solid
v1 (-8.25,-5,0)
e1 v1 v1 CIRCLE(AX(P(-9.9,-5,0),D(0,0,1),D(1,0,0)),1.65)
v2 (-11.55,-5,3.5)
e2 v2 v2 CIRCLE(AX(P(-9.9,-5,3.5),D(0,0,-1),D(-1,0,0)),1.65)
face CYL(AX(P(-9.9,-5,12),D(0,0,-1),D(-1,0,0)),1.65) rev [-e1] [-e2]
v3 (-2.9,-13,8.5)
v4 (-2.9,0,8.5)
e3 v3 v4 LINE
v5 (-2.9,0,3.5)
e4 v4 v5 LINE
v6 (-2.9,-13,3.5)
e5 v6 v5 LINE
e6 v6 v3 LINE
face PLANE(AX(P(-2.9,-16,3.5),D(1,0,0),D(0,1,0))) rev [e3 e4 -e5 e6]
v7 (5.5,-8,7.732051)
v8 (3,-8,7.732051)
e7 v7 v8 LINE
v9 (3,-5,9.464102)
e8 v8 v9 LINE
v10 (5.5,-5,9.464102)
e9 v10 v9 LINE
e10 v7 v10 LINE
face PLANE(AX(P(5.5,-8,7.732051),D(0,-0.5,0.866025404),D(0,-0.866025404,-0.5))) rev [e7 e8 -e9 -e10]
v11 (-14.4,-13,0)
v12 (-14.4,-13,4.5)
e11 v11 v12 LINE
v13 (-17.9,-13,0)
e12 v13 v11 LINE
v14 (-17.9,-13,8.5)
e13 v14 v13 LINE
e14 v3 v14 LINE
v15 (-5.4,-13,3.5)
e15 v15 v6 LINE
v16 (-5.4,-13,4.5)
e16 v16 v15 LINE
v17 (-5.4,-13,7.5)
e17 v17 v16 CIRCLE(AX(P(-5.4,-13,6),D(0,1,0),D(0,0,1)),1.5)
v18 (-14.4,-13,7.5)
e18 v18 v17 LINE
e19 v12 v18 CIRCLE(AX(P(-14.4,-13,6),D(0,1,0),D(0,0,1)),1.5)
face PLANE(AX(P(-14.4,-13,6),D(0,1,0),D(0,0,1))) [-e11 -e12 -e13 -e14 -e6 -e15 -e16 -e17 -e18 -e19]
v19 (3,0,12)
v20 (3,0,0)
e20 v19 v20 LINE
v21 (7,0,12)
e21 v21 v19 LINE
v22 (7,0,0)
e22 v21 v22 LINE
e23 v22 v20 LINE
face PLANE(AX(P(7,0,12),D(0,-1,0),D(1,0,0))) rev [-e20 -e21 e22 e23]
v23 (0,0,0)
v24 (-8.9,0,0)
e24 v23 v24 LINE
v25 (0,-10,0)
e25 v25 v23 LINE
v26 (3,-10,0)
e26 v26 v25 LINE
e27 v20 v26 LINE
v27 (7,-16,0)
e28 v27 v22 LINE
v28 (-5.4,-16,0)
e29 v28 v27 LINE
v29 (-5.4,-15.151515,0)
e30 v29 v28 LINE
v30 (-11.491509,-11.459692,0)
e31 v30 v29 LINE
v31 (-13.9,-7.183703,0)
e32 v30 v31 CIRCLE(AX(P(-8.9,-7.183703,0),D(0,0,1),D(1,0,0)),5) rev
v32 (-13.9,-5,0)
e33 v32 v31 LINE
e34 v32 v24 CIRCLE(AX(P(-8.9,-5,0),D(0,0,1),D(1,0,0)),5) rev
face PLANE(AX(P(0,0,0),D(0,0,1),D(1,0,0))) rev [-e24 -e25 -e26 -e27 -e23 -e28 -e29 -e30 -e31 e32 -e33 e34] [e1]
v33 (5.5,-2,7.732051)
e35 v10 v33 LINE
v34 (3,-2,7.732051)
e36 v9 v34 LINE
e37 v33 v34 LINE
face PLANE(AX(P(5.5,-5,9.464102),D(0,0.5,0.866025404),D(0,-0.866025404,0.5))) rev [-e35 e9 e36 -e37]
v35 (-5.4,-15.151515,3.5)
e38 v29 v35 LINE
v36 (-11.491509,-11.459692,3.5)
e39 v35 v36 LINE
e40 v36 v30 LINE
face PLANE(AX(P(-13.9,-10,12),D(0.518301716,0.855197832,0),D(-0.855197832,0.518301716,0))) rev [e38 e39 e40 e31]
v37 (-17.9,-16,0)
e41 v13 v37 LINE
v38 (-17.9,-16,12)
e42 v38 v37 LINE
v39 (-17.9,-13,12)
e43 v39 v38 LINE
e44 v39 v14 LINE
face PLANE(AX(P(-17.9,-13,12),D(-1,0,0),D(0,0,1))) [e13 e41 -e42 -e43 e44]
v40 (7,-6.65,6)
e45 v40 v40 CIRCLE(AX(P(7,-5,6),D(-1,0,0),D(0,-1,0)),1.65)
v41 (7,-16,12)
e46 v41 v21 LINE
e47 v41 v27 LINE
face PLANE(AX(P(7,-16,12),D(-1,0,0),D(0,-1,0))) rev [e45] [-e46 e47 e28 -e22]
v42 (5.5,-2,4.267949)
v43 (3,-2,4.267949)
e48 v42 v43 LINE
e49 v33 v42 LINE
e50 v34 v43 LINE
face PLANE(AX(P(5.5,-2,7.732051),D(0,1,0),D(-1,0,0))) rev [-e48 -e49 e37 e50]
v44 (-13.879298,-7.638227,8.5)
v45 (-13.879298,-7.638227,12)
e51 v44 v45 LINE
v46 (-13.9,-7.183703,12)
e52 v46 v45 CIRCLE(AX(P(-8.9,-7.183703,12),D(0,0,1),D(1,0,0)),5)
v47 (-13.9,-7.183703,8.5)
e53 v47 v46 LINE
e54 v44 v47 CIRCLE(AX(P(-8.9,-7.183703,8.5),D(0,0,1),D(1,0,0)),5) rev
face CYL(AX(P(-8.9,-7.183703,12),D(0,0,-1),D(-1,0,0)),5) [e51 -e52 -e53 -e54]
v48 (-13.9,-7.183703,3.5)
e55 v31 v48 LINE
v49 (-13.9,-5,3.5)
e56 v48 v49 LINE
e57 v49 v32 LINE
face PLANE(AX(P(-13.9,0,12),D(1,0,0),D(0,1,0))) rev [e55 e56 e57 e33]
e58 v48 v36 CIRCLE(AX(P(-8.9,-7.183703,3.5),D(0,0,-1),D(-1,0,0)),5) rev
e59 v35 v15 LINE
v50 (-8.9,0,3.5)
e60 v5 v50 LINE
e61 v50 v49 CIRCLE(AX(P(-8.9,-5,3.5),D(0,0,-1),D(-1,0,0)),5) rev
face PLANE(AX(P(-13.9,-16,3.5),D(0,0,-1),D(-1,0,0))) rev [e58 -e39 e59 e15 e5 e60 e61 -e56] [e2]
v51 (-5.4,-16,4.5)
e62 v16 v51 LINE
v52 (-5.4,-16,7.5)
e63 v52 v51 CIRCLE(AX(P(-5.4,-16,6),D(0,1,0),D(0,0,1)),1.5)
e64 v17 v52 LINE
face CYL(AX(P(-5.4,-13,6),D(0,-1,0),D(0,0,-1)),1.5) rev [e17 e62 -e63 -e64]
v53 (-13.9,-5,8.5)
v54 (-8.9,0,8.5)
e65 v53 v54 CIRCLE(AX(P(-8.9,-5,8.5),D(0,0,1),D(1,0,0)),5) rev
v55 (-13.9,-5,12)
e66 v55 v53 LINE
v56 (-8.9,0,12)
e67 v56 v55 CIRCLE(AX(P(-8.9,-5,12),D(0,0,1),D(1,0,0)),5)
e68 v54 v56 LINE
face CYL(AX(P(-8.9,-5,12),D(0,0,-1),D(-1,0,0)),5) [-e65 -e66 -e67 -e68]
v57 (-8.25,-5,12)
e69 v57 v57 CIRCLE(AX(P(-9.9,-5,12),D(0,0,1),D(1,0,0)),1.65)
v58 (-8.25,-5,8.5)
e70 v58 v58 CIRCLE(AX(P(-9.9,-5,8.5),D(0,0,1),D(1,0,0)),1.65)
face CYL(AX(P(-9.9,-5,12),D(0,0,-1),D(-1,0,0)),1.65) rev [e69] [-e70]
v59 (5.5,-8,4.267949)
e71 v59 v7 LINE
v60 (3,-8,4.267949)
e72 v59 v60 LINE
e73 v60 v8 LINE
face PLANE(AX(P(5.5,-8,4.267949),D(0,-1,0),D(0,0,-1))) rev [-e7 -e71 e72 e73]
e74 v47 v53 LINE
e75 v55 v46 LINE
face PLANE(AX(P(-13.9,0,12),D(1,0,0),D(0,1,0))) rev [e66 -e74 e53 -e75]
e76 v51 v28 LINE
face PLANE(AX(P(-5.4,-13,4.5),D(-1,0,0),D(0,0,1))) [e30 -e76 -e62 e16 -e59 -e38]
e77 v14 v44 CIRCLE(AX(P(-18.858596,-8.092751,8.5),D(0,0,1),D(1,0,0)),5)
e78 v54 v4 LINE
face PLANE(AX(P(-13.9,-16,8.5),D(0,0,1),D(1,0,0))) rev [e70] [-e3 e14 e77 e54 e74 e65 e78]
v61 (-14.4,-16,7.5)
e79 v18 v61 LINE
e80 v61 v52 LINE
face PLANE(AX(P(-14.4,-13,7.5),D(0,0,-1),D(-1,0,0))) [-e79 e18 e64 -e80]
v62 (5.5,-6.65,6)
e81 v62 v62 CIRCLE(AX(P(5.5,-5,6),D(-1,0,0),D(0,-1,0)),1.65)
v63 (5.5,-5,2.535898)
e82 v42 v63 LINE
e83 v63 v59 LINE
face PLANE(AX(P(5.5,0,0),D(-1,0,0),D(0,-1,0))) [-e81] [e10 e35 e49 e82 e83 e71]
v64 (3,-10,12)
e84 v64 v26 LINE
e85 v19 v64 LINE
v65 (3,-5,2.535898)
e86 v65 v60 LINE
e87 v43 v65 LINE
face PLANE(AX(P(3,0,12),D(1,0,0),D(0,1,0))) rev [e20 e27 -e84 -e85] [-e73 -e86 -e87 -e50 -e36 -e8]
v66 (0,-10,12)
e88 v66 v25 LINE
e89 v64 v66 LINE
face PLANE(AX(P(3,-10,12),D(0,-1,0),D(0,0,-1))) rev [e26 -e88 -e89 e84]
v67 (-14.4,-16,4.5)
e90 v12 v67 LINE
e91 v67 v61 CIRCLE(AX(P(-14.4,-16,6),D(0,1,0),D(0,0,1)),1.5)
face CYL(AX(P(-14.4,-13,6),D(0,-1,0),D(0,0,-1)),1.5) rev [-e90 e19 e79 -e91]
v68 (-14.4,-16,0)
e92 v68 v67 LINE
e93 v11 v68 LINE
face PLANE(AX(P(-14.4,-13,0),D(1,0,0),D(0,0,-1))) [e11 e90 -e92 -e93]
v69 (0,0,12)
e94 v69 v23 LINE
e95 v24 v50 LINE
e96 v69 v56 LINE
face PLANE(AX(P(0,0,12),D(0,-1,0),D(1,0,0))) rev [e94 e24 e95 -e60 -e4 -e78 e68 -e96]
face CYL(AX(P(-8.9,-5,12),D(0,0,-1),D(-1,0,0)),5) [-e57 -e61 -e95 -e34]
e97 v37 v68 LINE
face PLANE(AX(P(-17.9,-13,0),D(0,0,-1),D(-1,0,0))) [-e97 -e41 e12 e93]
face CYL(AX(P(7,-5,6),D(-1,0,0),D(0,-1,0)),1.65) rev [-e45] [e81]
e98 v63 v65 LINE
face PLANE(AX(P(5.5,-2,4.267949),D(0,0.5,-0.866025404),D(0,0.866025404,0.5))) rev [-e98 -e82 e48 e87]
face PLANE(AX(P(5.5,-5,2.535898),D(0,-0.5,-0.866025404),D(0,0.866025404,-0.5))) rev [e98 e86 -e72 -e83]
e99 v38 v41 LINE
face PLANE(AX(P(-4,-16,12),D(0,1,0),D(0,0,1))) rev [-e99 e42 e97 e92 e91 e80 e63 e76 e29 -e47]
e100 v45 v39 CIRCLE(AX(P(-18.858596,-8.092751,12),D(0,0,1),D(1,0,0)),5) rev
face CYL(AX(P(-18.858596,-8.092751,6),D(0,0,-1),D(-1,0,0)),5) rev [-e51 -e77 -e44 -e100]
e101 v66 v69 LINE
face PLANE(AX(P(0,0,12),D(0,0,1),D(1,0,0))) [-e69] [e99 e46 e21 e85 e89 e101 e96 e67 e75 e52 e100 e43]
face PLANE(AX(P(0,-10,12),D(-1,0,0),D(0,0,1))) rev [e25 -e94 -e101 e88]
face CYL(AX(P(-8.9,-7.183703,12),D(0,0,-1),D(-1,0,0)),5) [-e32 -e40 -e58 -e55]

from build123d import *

# Parameters (mm, degrees)
ESBO_O1_R                = 1.65
RESSALTO_EXTRUS_O1_DEPTH = 12
ESBO_O2_W                = 11
ESBO_O2_H                = 5
CORTE_EXTRUS_O1_DEPTH    = 25.355902775
FILETE1_R                = 5
ESBO_O3_R                = 1.65
CORTE_EXTRUS_O2_DEPTH    = 2.5
ESBO_O3_2_R              = 1.65
CORTE_EXTRUS_O3_DEPTH    = 27.184155514
RESSALTO_EXTRUS_O2_DEPTH = 3
FILETE2_R                = 5


with BuildPart() as part:
    # Esboço1 → Ressalto-extrusão1 (new body)
    with BuildSketch(Plane.XY):
        Polygon((0, 0), (-13.9, 0), (-13.9, -10), (-4, -16), (7, -16), (7, 0), (3, 0), (3, -10), (0, -10), align=None)
        with Locations((-9.9, -5)):
            Circle(ESBO_O1_R, mode=Mode.SUBTRACT)
    extrude(amount=RESSALTO_EXTRUS_O1_DEPTH)

    # Esboço2 → Corte-extrusão1 (cut, through all)
    with BuildSketch(Plane(origin=(0, 0, 0), x_dir=(1, 0, 0), z_dir=(0, 1, 0))):
        with Locations((-8.4, -6)):
            Rectangle(ESBO_O2_W, ESBO_O2_H)
    extrude(amount=-CORTE_EXTRUS_O1_DEPTH, mode=Mode.SUBTRACT)

    # Filete1
    filete1_edges = [part.edges().sort_by_distance(p)[0] for p in [
        (-4, -16, 1.75),
        (-13.9, -10, 10.25),
        (-13.9, -10, 1.75),
        (-13.9, 0, 1.75),
        (-13.9, 0, 10.25),
    ]]
    fillet(filete1_edges, radius=FILETE1_R)

    # Esboço3 → Corte-extrusão2 (cut)
    with BuildSketch(Plane.ZY.offset(-3)):
        Polygon((2.535898385, -5), (4.267949192, -8), (7.732050808, -8), (9.464101615, -5), (7.732050808, -2), (4.267949192, -2), align=None)
        with Locations(Location((6, -5, 0), (0, 0, 270))):
            Circle(ESBO_O3_R, mode=Mode.SUBTRACT)
    extrude(amount=-CORTE_EXTRUS_O2_DEPTH, mode=Mode.SUBTRACT)

    # Esboço3<2> → Corte-extrusão3 (cut, through all)
    with BuildSketch(Plane.ZY.offset(-3)):
        with Locations(Location((6, -5, 0), (0, 0, 270))):
            Circle(ESBO_O3_2_R)
    extrude(amount=-CORTE_EXTRUS_O3_DEPTH, mode=Mode.SUBTRACT)

    # Esboço4 → Ressalto-extrusão2 (add)
    with BuildSketch(Plane.XZ.offset(16)):
        with BuildLine():
            Line((7, 12), (-17.9, 12))
            Line((-17.9, 12), (-17.9, 0))
            Line((-17.9, 0), (-14.4, 0))
            Line((-14.4, 0), (-14.4, 4.5))
            ThreePointArc((-14.4, 4.5), (-15.9, 6), (-14.4, 7.5))
            Line((-14.4, 7.5), (-5.4, 7.5))
            ThreePointArc((-5.4, 7.5), (-3.9, 6), (-5.4, 4.5))
            Line((-5.4, 4.5), (-5.4, 0))
            Line((-5.4, 0), (7, 0))
            Line((7, 0), (7, 12))
        make_face()
    extrude(amount=-RESSALTO_EXTRUS_O2_DEPTH)

    # Filete2
    # the kernel refuses this fillet: 5 mm, written as the material it adds along each edge
    with BuildSketch(Plane(origin=(-8.95, -13, 12), x_dir=(-1, 0, 0), z_dir=(0, 0, -1))) as filete2_piece_1:
        with BuildLine():
            CenterArc((9.908595848, 4.907249128), FILETE2_R, 174.784336803, 84.162533203)
            Line((4.929297924, 5.361773258), (4.431368132, 5.407225671))
            ThreePointArc((4.431368132, 5.407225671), (2.282357722, 1.967907146), (-0.259150858, 0.427598916))
            Line((-0.259150858, 0.427598916), (0, -0.5))
            ThreePointArc((0, -0.5), (4.475, -0.5), (8.854140415, -0.490724913))
            Line((8.854140415, -0.490724913), (8.95, 0))
        make_face()
    extrude(amount=3.5)


solid = part.part
